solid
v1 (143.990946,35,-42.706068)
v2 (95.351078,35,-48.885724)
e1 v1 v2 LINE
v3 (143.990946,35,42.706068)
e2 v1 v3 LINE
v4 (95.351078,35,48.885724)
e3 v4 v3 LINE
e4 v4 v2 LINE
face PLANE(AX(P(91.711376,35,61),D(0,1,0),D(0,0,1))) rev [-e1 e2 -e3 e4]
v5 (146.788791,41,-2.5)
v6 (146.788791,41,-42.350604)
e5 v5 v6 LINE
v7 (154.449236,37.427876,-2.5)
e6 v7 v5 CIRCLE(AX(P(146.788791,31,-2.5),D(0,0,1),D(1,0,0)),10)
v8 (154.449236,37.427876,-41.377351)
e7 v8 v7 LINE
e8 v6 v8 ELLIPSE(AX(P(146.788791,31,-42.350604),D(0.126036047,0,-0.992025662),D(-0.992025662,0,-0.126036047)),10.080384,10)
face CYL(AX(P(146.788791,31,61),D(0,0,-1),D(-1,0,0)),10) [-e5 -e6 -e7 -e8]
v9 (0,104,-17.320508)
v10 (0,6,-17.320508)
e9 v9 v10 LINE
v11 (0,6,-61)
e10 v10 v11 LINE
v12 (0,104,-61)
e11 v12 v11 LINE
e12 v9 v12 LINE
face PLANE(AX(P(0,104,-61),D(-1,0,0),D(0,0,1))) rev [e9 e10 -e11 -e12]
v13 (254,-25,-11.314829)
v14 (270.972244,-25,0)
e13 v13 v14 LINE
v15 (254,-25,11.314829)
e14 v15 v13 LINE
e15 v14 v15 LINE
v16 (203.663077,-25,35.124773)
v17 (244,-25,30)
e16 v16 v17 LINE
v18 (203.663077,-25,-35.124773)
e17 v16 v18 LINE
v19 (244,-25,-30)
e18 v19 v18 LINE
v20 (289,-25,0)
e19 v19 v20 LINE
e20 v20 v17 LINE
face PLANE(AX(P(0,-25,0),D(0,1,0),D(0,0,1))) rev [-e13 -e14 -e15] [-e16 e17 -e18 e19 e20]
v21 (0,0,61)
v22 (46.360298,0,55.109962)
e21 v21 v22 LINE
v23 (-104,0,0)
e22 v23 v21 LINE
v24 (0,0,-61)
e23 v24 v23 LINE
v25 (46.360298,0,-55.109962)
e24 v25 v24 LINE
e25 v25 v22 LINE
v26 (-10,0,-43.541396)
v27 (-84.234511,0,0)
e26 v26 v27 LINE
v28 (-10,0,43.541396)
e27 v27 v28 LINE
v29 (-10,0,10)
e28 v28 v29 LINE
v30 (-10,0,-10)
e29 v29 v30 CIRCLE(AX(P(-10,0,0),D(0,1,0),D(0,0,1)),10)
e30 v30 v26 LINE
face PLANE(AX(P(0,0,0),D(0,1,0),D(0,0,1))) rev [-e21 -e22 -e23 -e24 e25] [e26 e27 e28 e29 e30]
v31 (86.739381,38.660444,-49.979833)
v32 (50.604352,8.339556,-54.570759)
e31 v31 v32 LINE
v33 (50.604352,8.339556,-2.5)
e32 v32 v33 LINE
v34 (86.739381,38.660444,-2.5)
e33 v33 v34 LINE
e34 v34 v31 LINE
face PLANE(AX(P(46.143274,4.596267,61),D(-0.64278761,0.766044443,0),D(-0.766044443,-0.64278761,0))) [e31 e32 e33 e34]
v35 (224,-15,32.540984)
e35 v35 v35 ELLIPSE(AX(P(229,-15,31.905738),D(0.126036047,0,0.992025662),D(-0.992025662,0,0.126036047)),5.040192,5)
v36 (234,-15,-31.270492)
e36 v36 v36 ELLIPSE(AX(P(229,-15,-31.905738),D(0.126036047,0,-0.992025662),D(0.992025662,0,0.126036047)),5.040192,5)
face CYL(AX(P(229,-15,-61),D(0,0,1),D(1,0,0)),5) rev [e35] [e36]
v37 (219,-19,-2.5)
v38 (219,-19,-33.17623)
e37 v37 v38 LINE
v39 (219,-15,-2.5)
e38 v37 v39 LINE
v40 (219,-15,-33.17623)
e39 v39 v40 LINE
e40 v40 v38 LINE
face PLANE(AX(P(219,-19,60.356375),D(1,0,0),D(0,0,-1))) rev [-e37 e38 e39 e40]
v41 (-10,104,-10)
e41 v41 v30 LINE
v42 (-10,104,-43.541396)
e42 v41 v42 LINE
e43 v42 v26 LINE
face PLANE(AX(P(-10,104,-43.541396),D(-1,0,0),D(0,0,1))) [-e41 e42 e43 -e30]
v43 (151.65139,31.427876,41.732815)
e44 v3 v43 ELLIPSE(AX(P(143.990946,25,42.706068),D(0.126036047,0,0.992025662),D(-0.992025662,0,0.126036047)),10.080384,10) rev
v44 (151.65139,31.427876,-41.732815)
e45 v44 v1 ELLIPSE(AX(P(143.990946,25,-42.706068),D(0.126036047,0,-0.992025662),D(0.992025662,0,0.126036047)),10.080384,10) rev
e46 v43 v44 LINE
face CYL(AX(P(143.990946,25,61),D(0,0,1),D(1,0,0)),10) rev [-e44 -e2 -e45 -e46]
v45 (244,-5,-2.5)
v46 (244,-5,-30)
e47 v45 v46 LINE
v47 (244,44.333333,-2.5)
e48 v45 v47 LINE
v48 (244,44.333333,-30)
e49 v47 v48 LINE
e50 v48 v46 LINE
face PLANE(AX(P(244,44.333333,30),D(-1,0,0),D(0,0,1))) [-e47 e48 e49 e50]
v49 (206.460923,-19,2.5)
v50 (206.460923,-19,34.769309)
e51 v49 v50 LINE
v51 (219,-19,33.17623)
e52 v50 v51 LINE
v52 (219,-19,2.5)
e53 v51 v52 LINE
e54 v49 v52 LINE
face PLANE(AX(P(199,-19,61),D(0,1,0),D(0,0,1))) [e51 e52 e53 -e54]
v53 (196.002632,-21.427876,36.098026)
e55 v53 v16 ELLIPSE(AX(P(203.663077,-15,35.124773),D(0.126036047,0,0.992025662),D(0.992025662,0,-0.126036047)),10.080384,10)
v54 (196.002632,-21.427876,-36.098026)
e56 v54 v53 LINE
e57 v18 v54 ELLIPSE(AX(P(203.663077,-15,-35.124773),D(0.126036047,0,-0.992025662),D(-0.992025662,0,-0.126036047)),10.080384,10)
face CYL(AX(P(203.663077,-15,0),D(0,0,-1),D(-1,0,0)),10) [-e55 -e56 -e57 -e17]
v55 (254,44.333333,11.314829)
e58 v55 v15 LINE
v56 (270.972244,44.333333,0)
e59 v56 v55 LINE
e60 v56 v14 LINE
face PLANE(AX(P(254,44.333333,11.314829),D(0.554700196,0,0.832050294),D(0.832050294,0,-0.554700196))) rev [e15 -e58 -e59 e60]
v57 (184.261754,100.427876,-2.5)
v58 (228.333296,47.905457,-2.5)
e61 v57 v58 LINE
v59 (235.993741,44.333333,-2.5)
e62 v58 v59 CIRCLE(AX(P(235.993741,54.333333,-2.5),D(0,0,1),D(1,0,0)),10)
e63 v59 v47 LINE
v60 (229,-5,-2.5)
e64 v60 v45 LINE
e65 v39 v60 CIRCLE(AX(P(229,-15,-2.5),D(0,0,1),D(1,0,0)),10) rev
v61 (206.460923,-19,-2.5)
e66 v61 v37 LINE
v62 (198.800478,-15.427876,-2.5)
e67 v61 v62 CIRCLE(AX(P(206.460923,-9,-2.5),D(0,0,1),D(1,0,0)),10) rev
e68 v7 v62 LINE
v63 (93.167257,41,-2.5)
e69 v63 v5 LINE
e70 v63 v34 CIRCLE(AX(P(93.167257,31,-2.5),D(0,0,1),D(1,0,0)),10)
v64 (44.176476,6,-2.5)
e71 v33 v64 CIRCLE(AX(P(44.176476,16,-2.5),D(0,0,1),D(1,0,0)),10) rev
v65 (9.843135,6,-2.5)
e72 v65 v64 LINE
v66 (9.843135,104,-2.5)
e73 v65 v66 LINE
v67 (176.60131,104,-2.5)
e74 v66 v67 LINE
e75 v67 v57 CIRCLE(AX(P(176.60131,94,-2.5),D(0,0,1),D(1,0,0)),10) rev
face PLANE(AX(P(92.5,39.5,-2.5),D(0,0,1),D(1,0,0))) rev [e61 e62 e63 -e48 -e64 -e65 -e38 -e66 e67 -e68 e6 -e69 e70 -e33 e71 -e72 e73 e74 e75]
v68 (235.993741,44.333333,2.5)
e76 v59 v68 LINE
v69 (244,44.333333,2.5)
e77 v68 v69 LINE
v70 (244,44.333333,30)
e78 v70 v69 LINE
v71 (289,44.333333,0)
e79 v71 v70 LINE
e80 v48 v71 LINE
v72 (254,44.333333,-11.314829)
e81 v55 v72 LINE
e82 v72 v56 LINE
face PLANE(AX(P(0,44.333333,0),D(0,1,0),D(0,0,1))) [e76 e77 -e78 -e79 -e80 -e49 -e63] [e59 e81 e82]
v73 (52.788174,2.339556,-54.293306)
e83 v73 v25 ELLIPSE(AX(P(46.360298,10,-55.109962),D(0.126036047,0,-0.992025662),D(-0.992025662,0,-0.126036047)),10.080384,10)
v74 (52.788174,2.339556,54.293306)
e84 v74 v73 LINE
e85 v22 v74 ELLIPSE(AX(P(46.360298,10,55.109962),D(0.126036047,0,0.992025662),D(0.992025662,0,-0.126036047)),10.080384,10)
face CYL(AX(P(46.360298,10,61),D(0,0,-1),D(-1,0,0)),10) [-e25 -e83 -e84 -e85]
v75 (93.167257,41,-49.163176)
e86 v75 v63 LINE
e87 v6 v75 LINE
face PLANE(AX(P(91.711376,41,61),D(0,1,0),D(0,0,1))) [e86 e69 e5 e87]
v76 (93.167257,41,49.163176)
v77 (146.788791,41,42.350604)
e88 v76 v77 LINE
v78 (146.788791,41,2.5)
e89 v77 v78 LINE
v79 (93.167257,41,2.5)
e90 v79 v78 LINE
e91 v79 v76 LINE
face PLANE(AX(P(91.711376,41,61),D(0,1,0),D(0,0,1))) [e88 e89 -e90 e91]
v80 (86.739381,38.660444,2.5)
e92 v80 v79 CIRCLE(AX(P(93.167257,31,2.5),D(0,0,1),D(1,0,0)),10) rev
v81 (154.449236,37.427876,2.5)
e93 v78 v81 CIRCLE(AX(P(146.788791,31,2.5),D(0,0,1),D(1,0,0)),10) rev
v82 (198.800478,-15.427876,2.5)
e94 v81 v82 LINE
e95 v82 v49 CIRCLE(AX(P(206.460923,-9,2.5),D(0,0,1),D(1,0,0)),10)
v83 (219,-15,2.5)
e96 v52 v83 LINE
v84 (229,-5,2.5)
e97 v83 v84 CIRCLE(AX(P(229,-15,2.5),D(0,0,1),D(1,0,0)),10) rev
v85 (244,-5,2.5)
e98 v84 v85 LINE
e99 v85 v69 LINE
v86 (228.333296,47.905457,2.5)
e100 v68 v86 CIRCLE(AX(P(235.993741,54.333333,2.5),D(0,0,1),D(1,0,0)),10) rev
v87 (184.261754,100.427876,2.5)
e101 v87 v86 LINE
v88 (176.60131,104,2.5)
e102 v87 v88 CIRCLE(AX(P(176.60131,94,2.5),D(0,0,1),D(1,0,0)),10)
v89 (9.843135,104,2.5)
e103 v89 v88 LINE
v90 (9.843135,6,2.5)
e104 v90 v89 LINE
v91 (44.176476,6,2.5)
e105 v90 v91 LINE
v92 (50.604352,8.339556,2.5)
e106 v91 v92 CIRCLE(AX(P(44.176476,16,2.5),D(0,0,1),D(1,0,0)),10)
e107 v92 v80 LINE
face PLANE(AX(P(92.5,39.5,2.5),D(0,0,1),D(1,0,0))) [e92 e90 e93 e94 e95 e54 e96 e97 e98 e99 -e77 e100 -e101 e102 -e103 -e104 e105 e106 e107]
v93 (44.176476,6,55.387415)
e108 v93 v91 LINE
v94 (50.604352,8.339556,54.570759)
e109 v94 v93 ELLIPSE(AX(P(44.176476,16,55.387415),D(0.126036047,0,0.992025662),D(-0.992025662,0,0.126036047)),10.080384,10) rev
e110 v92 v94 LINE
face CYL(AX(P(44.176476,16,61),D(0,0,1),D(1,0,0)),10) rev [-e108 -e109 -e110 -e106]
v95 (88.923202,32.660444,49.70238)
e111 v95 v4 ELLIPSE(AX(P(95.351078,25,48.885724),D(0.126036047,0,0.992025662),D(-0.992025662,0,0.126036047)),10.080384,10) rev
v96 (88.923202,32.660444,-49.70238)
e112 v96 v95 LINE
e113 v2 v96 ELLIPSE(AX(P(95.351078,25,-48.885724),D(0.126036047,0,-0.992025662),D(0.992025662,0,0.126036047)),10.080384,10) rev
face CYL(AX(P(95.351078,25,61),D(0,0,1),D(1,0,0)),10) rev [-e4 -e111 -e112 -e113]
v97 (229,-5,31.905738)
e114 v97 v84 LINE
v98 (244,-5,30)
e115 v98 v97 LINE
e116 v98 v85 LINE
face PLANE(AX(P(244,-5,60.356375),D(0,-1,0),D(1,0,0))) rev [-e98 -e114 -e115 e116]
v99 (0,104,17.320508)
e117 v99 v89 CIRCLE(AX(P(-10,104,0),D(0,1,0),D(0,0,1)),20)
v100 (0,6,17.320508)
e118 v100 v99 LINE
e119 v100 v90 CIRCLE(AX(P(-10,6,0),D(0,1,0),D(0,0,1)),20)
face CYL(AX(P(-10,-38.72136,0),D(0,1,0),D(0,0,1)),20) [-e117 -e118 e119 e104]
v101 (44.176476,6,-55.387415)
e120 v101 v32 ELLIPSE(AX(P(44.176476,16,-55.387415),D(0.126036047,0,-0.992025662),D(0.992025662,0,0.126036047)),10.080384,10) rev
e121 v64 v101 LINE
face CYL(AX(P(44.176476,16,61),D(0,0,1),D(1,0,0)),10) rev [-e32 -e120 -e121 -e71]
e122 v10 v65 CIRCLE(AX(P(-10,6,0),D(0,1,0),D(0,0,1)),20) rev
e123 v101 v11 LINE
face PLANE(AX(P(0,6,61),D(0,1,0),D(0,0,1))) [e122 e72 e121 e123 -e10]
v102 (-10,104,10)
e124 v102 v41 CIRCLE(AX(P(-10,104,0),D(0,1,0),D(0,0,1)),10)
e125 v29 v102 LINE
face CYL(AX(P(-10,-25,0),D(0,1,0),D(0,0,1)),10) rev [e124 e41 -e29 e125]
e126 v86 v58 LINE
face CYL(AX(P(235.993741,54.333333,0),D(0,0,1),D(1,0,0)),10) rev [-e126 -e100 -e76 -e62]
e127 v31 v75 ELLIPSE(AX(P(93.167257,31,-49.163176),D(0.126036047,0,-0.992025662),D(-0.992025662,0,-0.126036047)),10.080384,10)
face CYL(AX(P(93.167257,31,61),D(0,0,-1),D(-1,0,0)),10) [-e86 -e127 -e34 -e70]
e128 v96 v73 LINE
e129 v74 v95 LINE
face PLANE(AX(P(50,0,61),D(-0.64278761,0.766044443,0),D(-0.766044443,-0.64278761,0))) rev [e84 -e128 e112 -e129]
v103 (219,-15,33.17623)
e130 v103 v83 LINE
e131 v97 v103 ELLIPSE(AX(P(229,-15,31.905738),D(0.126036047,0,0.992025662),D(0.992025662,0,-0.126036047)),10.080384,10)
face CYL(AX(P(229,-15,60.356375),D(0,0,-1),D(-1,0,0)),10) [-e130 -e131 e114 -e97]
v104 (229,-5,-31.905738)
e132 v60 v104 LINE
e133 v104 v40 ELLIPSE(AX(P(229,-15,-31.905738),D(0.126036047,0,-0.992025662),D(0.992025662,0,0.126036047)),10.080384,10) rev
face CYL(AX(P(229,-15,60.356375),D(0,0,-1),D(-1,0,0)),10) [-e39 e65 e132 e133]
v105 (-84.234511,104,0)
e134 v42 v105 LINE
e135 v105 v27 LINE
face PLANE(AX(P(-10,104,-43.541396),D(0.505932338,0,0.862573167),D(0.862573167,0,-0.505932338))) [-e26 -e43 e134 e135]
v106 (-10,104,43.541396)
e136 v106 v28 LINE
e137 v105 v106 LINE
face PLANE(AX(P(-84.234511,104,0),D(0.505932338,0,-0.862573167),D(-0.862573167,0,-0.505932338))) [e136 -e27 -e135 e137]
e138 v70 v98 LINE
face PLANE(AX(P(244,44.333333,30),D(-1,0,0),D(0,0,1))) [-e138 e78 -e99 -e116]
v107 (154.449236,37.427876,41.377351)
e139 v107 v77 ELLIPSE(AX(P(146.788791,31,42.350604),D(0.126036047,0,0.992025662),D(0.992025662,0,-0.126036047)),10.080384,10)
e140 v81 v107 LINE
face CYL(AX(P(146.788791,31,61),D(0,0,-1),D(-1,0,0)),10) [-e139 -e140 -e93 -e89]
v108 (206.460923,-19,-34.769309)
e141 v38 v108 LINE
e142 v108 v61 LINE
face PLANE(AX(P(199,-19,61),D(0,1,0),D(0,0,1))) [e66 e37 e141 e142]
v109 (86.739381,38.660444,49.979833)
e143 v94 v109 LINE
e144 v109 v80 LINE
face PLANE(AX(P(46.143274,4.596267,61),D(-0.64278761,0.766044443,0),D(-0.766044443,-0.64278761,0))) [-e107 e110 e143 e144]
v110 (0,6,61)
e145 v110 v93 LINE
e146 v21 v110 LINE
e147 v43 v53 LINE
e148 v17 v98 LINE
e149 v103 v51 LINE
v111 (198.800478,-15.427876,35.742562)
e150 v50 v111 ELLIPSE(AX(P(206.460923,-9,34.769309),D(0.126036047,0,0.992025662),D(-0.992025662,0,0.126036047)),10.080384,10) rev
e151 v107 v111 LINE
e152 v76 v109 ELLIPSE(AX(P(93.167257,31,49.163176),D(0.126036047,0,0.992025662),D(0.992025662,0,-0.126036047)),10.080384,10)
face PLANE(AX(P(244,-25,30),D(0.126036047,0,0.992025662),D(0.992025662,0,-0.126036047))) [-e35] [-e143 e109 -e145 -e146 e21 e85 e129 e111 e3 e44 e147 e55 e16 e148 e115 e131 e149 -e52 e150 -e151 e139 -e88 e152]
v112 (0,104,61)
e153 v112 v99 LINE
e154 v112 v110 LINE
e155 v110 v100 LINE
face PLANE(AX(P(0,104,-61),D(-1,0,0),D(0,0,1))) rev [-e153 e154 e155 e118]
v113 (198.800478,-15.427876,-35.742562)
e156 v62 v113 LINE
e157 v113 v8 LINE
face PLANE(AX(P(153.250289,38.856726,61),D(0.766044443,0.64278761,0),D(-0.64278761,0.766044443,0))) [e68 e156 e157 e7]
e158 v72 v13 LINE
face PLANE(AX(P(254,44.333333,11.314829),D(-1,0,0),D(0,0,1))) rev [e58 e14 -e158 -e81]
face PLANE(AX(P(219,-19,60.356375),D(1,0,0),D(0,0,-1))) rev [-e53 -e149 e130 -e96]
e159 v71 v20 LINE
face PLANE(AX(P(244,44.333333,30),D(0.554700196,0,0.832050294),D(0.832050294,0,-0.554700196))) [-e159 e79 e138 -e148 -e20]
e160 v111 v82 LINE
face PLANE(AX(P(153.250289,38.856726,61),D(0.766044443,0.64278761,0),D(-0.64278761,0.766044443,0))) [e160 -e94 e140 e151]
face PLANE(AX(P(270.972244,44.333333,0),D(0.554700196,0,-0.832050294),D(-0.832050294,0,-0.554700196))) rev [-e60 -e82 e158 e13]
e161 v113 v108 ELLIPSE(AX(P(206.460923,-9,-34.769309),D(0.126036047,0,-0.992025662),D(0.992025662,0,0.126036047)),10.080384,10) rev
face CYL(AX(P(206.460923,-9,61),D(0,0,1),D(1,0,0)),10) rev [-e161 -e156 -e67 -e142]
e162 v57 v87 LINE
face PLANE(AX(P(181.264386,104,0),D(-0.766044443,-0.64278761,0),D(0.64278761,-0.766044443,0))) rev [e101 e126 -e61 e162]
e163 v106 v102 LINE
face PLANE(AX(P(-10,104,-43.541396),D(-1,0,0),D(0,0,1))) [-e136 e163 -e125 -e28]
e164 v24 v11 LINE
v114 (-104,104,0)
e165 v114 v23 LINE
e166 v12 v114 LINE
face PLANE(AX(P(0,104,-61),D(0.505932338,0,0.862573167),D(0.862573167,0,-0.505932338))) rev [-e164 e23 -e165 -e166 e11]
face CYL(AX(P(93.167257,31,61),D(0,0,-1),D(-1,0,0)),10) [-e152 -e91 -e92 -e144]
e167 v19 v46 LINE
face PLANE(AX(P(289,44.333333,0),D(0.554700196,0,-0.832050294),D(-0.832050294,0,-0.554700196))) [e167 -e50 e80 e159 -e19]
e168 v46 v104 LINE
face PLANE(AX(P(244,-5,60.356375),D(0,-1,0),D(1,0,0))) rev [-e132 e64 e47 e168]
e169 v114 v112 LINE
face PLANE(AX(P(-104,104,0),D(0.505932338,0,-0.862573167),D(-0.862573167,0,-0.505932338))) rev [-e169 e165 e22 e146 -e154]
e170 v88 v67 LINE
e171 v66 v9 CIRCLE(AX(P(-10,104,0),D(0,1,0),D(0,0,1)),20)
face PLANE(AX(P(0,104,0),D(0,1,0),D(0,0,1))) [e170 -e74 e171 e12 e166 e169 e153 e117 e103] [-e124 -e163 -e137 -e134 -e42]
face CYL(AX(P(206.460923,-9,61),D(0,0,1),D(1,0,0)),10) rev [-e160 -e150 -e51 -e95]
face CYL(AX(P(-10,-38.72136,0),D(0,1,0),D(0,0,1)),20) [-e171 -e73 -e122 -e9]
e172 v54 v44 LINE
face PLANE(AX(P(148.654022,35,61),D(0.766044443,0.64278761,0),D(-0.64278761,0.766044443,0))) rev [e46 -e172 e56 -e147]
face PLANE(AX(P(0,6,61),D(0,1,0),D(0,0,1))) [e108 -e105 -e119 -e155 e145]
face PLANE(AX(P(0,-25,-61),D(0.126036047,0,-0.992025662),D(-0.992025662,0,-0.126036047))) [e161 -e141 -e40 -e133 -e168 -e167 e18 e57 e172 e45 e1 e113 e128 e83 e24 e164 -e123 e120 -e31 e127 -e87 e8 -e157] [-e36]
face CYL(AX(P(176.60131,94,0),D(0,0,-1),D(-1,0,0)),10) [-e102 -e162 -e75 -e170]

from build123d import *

# Parameters (mm, degrees)
EXTRUDE_1_DEPTH             = 104
EXTRUDE_1_2_DEPTH           = 61
EXTRUDE_1_2_DEPTH_BACK      = 61
EXTRUDE_5_DEPTH             = 69.333333333
CUT_EXTRUDE_5_DEPTH         = 320.954684291
CUT_EXTRUDE_5_DEPTH_BACK    = 320.954684291
SKETCH_13_OUTSIDE_W         = 481.25
SKETCH_13_OUTSIDE_H         = 210.25
RIB_START                   = -2.5
RIB_2_DEPTH                 = 5
FILLET_1_R                  = 10
EXTRUDE_7_REACH             = 315.142
EXTRUDE_7_DIRECTION_2_REACH = 315.142
CUT_EXTRUDE_3_DEPTH         = 314.142140249
CUT_EXTRUDE_3_DEPTH_BACK    = 314.142140249
SKETCH_10_R                 = 5
EXTRUDE_8_DEPTH             = 98
CUT_EXTRUDE_6_DEPTH         = 323.308858085


# Read off the part's stored shape, not the designer's step: 보강대2
with BuildPart() as part:
    # 스케치1 → Extrude 1 (new body)
    with BuildSketch(Plane(origin=(0, 0, 0), x_dir=(1, 0, 0), z_dir=(0, 1, 0))):
        Polygon((0, 61), (0, -61), (-104, 0), align=None)
        Polygon((-10, 43.541395957), (-84.234511141, 0), (-10, -43.541395957), align=None, mode=Mode.SUBTRACT)
    extrude(amount=EXTRUDE_1_DEPTH)


with BuildPart() as body_2:
    # 스케치3 → Extrude 1 2 (new, two sides: drawn at the far end of the back side and taken through both)
    with BuildSketch(Plane.XY.offset(-EXTRUDE_1_2_DEPTH_BACK)):
        Polygon((0, 0), (50, 0), (91.711375741, 35), (148.654022129, 35), (199, -25), (244, -25), (244, -19), (201.797845949, -19), (151.451868078, 41), (89.527554335, 41), (47.816178594, 6), (0, 6), align=None)
    extrude(amount=EXTRUDE_1_2_DEPTH + EXTRUDE_1_2_DEPTH_BACK)

    # 스케치13 outside → 컷-돌출5 (cut, two sides: drawn at the far end of the back side and taken through both)
    with BuildSketch(Plane(origin=(0, -19, 0), x_dir=(1, 0, 0), z_dir=(0, 1, 0)).offset(-CUT_EXTRUDE_5_DEPTH_BACK)):
        with Locations((92.5, 0)):
            Rectangle(SKETCH_13_OUTSIDE_W, SKETCH_13_OUTSIDE_H)
        Polygon((0, 61), (244, 30), (244, -30), (0, -61), align=None, mode=Mode.SUBTRACT)
    extrude(amount=CUT_EXTRUDE_5_DEPTH + CUT_EXTRUDE_5_DEPTH_BACK, mode=Mode.SUBTRACT)


with BuildPart() as body_3:
    # 스케치12 → 보스-돌출5 (new body)
    with BuildSketch(Plane.XZ.offset(25)):
        Polygon((244, 30), (244, -30), (289, 0), align=None)
        Polygon((254, 11.314829082), (270.972243623, 0), (254, -11.314829082), align=None, mode=Mode.SUBTRACT)
    extrude(amount=-EXTRUDE_5_DEPTH)


with BuildPart() as part_1:
    add(part.part)

    # Combine 1: union body 3, body 2
    add(body_3.part)
    add(body_2.part)

    # 보강대2 outline → 보강대2 (add)
    with BuildSketch(Plane.XY.offset(RIB_START)):
        Polygon((231.330664299, 44.333333333), (181.264386305, 104), (0, 104), (0, 6), (47.816178594, 6), (89.527554335, 41), (151.451868078, 41), (201.797845949, -19), (244, -19), (244, 44.333333333), align=None)
    extrude(amount=RIB_2_DEPTH)

    # 필렛1
    fillet_1_edges = [part_1.edges().sort_by_distance(p)[0] for p in [
        (181.264386305, 104, 0),
        (199, -25, 0),
        (201.797845949, -19, 18.93087454),
        (151.451868078, 41, 22.129082151),
        (89.527554335, 41, 26.062798802),
        (47.816178594, 6, 28.712496852),
        (50, 0, 0),
        (91.711375741, 35, 0),
        (148.654022129, 35, 0),
        (47.816178594, 6, -28.712496852),
        (89.527554335, 41, -26.062798802),
        (151.451868078, 41, -22.129082151),
        (201.797845949, -19, -18.93087454),
        (231.330664299, 44.333333333, 0),
    ]]
    fillet(fillet_1_edges, radius=FILLET_1_R)

    # 보스-돌출7: up to this plane
    extrude_7_end = Plane(origin=(244, -25, 30), z_dir=(0.12603604726758494, 0, 0.9920256623642169))
    # 스케치9 → 보스-돌출7 (add, up to the surface)
    with BuildSketch(Plane.XY, mode=Mode.PRIVATE) as extrude_7_sk1:
        with BuildLine():
            Line((244, -19), (219, -19))
            Line((219, -19), (219, -15))
            ThreePointArc((219, -15), (221.928932188, -7.928932188), (229, -5))
            Line((229, -5), (244, -5))
            Line((244, -5), (244, -19))
        make_face()
    extrude_7_tool1 = split(extrude(extrude_7_sk1.sketch, amount=EXTRUDE_7_REACH, mode=Mode.PRIVATE), bisect_by=extrude_7_end, keep=Keep.BOTH, mode=Mode.PRIVATE)
    add(extrude_7_tool1.solids().sort_by_distance((232.170595, -12.311336, 0))[0])

    # 보스-돌출7 direction 2: up to this plane
    extrude_7_direction_2_end = Plane(origin=(0, -25, -61), z_dir=(0.12603604726758494, 0, -0.9920256623642169))
    # 스케치9 → 보스-돌출7 direction 2 (add, up to the surface)
    with BuildSketch(Plane.XY, mode=Mode.PRIVATE) as extrude_7_direction_2_sk1:
        with BuildLine():
            Line((244, -19), (219, -19))
            Line((219, -19), (219, -15))
            ThreePointArc((219, -15), (221.928932188, -7.928932188), (229, -5))
            Line((229, -5), (244, -5))
            Line((244, -5), (244, -19))
        make_face()
    extrude_7_direction_2_tool1 = split(extrude(extrude_7_direction_2_sk1.sketch, amount=-EXTRUDE_7_DIRECTION_2_REACH, mode=Mode.PRIVATE), bisect_by=extrude_7_direction_2_end, keep=Keep.BOTH, mode=Mode.PRIVATE)
    add(extrude_7_direction_2_tool1.solids().sort_by_distance((232.170595, -12.311336, 0))[0])

    # 스케치10 → 컷-돌출3 (cut, two sides: drawn at the far end of the back side and taken through both)
    with BuildSketch(Plane.XY.offset(-CUT_EXTRUDE_3_DEPTH_BACK)):
        with Locations((229, -15)):
            Circle(SKETCH_10_R)
    extrude(amount=CUT_EXTRUDE_3_DEPTH + CUT_EXTRUDE_3_DEPTH_BACK, mode=Mode.SUBTRACT)

    # 스케치14 → 보스-돌출8 (add)
    with BuildSketch(Plane(origin=(0, 104, 0), x_dir=(1, 0, 0), z_dir=(0, 1, 0))):
        with BuildLine():
            Line((-10, -20), (-10, -10))
            ThreePointArc((-10, -10), (0, 0), (-10, 10))
            Line((-10, 10), (-10, 20))
            ThreePointArc((-10, 20), (10, 0), (-10, -20))
        make_face()
    extrude(amount=-EXTRUDE_8_DEPTH)

    # 스케치14<2> → 컷-돌출6 (cut, through all)
    with BuildSketch(Plane(origin=(0, 104, 0), x_dir=(1, 0, 0), z_dir=(0, 1, 0))):
        with BuildLine():
            Line((-10, 10), (-10, -10))
            ThreePointArc((-10, -10), (0, 0), (-10, 10))
        make_face()
    extrude(amount=-CUT_EXTRUDE_6_DEPTH, mode=Mode.SUBTRACT)


solid = part_1.part
